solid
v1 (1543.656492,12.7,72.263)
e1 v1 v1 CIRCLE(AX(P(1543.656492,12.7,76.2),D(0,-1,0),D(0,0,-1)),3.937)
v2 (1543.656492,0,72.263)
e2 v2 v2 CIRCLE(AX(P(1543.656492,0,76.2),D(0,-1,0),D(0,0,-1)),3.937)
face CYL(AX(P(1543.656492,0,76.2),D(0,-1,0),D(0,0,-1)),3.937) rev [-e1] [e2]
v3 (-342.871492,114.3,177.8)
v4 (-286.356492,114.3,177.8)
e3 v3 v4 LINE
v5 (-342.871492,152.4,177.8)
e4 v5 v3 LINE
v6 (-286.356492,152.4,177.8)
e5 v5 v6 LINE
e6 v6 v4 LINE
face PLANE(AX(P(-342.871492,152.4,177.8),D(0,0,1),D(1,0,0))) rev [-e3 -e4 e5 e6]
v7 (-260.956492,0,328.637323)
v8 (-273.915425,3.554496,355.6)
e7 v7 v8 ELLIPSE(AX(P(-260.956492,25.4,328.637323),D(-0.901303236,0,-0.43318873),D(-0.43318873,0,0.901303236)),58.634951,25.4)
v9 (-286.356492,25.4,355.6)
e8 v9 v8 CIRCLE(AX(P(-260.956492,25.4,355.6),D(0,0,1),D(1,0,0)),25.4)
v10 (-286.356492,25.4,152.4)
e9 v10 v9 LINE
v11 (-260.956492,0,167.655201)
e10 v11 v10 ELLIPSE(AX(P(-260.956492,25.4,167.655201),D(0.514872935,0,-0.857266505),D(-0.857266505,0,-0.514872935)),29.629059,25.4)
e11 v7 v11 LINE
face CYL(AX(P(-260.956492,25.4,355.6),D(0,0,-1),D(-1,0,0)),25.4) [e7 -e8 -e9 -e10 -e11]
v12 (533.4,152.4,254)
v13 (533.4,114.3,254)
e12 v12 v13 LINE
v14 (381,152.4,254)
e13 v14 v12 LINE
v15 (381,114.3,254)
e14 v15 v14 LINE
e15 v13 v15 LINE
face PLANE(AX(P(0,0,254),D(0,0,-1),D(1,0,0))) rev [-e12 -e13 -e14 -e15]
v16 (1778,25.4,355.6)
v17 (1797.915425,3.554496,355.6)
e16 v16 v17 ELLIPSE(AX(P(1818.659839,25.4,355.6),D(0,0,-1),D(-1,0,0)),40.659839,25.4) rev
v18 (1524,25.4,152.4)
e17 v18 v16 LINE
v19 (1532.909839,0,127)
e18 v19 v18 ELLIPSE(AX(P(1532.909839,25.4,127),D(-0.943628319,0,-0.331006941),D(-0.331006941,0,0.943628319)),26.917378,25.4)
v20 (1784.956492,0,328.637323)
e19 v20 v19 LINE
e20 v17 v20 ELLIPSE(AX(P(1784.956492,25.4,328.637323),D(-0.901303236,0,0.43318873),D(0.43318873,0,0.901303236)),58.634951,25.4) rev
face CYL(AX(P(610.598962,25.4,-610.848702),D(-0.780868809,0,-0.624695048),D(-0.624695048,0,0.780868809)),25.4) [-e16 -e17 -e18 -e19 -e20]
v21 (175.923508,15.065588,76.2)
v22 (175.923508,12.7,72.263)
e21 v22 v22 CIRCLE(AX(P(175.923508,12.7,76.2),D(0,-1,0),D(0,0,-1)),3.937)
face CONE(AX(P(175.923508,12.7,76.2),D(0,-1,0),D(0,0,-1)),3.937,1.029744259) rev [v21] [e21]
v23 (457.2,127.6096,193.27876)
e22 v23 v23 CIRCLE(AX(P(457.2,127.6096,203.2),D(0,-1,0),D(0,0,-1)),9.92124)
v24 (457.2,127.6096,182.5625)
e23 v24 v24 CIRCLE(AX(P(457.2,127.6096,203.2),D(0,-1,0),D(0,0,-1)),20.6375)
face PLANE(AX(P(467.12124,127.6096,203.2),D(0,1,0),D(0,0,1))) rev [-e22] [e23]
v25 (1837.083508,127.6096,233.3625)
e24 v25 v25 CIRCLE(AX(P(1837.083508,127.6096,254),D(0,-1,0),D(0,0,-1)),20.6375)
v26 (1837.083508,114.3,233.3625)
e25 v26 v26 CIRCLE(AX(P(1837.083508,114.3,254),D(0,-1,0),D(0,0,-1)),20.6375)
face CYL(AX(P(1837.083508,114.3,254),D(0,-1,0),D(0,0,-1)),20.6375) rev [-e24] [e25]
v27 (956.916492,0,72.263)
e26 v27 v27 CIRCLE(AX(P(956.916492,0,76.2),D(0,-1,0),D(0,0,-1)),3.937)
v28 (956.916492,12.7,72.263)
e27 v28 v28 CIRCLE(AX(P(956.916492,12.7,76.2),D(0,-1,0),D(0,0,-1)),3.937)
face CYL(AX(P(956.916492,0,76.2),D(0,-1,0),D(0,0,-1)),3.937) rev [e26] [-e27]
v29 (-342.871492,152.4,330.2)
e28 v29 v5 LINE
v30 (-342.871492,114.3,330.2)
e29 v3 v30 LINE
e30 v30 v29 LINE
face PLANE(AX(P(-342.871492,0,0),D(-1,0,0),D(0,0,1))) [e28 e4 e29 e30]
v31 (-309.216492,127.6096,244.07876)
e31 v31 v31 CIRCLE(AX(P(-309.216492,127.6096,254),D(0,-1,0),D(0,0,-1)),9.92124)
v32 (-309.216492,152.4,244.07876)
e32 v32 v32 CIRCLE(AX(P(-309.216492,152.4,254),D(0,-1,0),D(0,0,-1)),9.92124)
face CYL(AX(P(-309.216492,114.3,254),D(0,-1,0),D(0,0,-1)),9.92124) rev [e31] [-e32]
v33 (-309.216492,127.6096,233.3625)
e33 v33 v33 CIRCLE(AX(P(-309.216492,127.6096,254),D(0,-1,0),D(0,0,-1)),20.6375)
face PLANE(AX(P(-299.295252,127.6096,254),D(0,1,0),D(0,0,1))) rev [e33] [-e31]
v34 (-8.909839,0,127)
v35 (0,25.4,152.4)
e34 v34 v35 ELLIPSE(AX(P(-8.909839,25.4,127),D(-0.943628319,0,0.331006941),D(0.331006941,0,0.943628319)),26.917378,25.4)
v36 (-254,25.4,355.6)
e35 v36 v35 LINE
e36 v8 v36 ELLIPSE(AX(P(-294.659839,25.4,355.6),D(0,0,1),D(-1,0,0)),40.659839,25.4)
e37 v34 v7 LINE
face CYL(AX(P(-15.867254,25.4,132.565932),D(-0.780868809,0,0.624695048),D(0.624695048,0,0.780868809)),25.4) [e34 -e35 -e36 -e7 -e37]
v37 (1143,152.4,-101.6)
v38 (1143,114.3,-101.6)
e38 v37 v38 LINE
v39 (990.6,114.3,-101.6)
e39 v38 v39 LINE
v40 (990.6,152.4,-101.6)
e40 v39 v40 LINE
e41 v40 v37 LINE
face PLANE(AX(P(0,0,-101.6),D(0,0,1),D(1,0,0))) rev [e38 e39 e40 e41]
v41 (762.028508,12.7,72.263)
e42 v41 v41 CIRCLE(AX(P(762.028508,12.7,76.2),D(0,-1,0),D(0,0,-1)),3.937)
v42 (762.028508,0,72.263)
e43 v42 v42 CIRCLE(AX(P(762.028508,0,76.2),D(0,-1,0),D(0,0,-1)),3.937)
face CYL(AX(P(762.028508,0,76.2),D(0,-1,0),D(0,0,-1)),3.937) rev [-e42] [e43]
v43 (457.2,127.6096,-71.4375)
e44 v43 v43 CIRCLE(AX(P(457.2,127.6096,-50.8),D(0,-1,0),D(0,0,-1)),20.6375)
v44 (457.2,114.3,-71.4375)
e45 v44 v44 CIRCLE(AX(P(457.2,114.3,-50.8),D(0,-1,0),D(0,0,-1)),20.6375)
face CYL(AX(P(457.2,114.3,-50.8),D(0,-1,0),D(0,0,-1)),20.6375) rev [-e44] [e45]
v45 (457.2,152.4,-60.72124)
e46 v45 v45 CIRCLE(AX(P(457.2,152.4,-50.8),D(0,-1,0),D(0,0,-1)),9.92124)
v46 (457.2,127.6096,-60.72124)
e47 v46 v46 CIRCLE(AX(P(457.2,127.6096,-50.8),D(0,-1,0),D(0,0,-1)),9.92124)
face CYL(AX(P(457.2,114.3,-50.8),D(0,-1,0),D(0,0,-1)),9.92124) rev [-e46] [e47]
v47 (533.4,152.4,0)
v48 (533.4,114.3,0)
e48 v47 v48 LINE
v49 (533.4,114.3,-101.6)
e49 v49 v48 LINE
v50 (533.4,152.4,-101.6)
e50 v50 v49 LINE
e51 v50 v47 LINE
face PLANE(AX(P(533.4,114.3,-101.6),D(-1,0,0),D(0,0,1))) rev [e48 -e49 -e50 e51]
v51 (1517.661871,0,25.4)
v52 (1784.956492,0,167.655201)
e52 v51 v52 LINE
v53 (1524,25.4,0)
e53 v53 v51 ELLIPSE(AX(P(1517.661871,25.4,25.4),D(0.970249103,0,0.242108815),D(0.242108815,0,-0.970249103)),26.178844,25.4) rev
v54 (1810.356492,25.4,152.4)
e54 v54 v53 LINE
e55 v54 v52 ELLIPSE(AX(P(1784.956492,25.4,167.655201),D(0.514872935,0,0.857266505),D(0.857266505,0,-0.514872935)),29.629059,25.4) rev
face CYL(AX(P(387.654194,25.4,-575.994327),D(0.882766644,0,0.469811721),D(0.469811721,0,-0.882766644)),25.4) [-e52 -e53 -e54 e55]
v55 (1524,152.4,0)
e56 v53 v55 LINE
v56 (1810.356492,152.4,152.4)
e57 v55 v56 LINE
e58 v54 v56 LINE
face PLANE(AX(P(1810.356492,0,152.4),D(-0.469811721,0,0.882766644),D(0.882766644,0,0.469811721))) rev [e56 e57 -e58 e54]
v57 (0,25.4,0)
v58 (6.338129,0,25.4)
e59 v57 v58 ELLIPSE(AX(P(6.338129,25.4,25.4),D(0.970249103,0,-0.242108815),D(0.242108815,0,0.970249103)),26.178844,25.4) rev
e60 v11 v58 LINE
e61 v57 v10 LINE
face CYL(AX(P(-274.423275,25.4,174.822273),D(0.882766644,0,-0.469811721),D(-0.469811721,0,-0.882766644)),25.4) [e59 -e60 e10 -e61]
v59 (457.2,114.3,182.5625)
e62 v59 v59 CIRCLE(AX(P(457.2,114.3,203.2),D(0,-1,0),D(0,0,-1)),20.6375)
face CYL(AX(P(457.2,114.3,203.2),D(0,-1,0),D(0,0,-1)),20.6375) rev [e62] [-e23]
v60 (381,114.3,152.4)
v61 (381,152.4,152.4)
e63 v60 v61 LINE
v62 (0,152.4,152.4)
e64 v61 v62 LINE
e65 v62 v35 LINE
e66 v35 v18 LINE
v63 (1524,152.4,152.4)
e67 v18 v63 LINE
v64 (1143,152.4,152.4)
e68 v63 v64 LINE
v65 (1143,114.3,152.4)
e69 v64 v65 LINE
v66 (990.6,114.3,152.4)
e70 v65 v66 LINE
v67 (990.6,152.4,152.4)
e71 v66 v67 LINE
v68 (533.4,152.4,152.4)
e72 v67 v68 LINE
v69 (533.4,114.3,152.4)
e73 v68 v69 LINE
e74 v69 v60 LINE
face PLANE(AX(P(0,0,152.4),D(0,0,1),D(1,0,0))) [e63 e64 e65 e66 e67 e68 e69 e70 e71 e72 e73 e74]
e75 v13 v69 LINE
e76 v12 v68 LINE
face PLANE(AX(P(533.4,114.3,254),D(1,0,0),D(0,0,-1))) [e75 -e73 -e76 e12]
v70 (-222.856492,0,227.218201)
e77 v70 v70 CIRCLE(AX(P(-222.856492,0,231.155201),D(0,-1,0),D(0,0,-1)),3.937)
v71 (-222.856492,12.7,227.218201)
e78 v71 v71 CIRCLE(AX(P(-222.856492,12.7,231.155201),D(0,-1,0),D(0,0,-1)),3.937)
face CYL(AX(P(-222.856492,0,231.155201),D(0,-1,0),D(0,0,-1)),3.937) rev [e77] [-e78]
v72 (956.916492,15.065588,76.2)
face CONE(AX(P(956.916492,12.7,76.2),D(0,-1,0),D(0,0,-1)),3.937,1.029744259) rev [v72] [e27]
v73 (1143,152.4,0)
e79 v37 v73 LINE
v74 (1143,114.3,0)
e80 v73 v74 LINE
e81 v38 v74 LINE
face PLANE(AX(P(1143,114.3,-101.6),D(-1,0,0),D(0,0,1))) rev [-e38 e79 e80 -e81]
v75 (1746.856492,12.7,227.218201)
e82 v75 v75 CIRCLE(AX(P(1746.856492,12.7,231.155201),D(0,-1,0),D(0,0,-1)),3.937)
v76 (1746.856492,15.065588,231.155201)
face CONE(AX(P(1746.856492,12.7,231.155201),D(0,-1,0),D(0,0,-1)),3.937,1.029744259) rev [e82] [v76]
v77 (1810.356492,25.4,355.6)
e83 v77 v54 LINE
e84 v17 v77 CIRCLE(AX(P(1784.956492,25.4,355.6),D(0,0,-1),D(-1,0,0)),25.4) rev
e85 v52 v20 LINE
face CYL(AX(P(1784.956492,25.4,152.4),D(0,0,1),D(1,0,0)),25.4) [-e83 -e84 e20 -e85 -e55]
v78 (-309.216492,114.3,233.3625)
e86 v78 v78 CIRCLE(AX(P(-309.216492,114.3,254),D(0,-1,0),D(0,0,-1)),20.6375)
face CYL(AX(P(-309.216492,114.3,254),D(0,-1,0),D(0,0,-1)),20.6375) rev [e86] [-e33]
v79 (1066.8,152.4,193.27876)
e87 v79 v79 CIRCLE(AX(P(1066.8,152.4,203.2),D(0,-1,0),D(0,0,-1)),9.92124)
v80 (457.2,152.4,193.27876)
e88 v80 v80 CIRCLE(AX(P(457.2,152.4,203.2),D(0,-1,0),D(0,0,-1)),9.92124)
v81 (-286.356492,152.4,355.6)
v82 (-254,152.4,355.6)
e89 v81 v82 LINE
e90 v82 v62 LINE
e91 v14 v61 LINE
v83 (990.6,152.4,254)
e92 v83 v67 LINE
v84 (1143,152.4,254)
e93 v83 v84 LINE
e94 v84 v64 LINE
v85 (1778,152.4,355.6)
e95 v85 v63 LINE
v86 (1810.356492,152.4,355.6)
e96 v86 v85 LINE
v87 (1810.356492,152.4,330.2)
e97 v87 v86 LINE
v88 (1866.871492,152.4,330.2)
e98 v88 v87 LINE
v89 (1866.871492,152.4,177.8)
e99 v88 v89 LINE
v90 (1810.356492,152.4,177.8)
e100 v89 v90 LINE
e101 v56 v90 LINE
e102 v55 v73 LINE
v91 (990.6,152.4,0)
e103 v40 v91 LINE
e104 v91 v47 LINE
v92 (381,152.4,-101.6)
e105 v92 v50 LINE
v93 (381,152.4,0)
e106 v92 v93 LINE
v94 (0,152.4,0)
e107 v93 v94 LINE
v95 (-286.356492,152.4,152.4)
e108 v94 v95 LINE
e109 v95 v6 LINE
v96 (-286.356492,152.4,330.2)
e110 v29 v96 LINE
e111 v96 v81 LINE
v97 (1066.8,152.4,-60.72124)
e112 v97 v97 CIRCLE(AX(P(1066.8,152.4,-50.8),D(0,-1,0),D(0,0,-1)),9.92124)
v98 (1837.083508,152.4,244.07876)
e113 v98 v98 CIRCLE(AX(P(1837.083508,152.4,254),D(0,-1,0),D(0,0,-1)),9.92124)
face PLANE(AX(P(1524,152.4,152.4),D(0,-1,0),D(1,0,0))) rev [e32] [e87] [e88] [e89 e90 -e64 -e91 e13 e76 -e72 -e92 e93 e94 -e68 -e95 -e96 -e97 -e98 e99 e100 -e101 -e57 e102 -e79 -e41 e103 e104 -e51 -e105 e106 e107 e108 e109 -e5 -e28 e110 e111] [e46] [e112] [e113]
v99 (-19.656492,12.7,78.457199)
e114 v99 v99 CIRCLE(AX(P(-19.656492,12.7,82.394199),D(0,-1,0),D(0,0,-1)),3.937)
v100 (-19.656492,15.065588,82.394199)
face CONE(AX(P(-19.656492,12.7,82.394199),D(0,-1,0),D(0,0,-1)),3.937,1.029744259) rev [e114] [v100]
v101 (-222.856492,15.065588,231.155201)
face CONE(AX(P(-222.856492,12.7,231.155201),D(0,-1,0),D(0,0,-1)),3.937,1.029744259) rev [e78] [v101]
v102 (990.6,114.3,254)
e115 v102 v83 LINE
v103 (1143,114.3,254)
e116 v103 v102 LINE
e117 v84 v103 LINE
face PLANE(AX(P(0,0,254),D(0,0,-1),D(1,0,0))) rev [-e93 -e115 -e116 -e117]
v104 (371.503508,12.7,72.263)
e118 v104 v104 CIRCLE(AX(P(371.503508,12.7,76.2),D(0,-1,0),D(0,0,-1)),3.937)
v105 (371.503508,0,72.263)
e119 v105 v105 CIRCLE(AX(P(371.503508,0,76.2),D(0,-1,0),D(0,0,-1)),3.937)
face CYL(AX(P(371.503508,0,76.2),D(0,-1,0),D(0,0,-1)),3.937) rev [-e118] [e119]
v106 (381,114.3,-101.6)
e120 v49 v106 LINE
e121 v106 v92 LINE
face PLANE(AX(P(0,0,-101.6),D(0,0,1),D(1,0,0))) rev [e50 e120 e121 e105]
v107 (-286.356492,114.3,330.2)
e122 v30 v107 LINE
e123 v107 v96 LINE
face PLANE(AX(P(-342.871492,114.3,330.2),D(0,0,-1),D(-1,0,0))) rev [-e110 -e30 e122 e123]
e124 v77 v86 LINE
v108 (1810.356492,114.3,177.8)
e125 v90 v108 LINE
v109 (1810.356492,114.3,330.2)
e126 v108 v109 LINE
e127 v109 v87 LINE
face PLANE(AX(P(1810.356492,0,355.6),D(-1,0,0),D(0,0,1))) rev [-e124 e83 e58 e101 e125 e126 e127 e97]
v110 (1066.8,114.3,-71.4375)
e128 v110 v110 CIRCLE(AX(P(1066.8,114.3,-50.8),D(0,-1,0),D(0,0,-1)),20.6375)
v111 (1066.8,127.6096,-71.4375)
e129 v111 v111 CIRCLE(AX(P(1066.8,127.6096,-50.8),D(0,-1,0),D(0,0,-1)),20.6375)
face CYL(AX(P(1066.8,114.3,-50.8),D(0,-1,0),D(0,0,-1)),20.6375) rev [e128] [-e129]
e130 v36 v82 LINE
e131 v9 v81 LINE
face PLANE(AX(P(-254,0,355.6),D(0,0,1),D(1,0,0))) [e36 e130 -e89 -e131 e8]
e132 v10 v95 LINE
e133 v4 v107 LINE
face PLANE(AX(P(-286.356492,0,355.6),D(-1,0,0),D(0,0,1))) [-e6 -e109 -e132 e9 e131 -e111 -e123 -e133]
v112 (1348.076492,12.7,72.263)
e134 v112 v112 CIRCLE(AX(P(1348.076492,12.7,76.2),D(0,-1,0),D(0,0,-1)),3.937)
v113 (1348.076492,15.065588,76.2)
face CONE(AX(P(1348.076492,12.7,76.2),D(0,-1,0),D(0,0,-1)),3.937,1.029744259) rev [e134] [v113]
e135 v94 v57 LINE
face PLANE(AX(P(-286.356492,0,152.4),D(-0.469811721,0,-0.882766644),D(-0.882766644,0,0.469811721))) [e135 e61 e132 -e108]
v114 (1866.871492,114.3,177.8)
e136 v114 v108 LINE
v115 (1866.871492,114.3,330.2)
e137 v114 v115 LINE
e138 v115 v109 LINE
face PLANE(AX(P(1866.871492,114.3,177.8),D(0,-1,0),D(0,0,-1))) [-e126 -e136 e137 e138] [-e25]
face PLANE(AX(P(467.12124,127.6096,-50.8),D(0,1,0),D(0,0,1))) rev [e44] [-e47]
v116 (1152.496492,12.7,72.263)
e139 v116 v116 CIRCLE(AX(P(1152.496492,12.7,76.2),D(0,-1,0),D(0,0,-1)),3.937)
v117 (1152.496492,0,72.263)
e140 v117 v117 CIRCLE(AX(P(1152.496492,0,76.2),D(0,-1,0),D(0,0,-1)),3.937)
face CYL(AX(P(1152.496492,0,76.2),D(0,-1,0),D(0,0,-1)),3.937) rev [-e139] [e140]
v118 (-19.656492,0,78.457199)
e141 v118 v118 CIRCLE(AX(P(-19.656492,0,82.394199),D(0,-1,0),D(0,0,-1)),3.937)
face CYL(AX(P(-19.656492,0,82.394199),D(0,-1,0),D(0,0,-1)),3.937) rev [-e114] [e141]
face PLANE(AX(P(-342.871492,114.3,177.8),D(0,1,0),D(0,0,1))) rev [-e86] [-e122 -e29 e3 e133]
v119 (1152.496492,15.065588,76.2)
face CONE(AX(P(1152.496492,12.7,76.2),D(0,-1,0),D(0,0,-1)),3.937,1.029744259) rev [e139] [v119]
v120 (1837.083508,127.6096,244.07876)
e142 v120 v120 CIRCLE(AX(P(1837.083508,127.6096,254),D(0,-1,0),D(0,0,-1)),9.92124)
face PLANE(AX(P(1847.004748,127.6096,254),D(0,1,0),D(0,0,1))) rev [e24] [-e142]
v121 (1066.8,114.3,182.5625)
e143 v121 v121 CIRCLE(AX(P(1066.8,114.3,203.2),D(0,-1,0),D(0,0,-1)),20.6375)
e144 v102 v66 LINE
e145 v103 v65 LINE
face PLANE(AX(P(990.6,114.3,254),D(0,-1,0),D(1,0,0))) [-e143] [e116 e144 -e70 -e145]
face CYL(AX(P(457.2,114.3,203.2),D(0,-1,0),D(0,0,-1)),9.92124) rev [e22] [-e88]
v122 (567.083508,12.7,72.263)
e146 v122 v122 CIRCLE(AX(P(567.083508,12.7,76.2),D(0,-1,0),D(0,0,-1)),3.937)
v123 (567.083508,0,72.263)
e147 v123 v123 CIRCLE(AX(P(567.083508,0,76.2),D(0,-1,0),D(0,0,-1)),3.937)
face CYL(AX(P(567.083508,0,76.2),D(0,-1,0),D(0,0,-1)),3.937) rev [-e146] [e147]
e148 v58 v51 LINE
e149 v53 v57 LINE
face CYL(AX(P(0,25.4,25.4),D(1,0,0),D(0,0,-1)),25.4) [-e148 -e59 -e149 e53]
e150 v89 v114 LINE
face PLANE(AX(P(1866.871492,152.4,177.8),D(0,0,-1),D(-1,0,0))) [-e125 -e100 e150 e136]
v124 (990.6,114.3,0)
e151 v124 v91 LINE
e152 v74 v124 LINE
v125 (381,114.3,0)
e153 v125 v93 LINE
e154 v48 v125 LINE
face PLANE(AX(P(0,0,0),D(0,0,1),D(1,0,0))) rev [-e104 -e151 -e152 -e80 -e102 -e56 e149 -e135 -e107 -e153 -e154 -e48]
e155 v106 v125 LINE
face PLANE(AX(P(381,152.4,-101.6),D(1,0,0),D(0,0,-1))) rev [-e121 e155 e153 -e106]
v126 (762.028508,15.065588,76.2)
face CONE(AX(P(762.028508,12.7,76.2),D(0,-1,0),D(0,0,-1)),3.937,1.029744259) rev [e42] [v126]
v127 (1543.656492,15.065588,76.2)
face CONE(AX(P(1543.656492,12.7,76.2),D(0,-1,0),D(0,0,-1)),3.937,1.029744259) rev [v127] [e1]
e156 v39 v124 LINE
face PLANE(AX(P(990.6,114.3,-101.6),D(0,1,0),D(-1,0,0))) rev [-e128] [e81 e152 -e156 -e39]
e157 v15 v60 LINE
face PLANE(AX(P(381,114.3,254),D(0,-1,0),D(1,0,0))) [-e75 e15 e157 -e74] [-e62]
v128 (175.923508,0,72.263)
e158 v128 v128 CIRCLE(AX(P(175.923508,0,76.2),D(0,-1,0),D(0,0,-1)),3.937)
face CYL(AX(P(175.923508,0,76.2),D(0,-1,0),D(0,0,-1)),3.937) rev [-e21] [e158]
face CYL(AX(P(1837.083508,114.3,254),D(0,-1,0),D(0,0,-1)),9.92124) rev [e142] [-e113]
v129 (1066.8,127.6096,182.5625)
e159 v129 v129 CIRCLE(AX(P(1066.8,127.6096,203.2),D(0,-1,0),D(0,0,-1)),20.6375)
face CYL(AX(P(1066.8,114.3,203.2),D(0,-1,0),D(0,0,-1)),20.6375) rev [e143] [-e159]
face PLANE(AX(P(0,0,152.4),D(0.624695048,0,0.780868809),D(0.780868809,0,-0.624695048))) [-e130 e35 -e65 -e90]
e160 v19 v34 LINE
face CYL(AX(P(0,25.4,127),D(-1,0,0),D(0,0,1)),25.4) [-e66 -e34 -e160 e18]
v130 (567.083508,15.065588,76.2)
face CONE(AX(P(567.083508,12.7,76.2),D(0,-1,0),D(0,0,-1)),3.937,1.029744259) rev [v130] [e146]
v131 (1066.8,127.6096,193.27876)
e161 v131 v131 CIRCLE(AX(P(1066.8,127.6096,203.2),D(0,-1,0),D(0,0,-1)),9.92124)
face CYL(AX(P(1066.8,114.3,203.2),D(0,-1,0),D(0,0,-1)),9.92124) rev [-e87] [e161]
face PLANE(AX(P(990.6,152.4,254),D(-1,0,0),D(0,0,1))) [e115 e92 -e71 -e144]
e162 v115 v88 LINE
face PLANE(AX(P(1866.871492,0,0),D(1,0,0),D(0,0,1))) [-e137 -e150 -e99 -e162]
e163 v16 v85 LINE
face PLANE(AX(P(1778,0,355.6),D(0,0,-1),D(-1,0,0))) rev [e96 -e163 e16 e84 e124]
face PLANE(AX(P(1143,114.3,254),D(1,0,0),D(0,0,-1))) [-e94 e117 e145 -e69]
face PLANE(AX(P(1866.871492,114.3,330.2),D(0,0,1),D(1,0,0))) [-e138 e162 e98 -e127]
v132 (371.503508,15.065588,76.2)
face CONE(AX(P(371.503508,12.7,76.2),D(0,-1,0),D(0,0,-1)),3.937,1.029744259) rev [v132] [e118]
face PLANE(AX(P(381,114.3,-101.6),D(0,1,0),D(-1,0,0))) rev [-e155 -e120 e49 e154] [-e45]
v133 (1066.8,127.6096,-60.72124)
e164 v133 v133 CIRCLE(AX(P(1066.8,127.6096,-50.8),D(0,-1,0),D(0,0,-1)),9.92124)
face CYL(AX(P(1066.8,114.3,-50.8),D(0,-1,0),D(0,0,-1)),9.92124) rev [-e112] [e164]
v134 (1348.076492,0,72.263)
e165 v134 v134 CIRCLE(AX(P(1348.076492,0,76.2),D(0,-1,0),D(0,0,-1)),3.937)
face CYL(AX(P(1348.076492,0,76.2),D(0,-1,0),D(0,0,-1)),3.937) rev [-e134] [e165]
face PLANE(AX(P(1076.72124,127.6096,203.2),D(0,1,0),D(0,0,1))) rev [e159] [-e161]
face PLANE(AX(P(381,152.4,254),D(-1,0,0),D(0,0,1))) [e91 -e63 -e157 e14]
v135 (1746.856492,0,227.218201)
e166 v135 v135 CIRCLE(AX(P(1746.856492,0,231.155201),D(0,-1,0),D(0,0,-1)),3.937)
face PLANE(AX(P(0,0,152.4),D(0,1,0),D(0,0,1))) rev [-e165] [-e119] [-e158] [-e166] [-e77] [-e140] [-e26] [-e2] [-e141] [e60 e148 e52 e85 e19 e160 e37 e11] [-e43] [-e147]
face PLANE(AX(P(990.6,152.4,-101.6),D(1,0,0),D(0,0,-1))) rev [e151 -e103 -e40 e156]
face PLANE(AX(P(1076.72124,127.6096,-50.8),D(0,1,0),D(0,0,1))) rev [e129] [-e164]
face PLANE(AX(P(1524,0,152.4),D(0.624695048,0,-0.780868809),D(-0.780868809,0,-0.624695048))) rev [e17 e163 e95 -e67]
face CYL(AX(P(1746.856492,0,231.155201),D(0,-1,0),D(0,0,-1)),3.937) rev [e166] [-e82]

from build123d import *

# Parameters (mm, degrees)
SKETCH1_W                                = 1524
SKETCH1_H                                = 152.4
BOSS_EXTRUDE1_DEPTH                      = 152.4
BOSS_EXTRUDE2_DEPTH                      = 152.4
FILLET1_R                                = 25.4
SKETCH9_W                                = 152.4
SKETCH9_H                                = 38.1
BOSS_EXTRUDE3_DEPTH                      = 101.6
SKETCH11_W                               = 152.4
SKETCH11_H                               = 38.1
BOSS_EXTRUDE4_DEPTH                      = 56.515
F_0000_CLEARANCE_HOLE1_D                 = 7.874
F_0000_CLEARANCE_HOLE1_DEPTH             = 12.7
F_0000_CLEARANCE_HOLE1_TIP               = 2.365588257
CBORE_FOR_3_4_HEX_HEAD_BOLT1_D           = 19.84248
CBORE_FOR_3_4_HEX_HEAD_BOLT1_CBORE_D     = 41.275
CBORE_FOR_3_4_HEX_HEAD_BOLT1_CBORE_DEPTH = 13.3096


with BuildPart() as part:
    # Sketch1 → Boss-Extrude1 (new body)
    with BuildSketch(Plane.XY):
        with Locations((762, 76.2)):
            Rectangle(SKETCH1_W, SKETCH1_H)
    extrude(amount=BOSS_EXTRUDE1_DEPTH)

    # Sketch8 → Boss-Extrude2 (add)
    with BuildSketch(Plane(origin=(0, 152.4, 0), x_dir=(1, 0, 0), z_dir=(0, 1, 0))):
        Polygon((0, -152.4), (-254, -355.6), (-286.356492461, -355.6), (-286.356492461, -152.4), (0, 0), align=None)
    boss_extrude2 = extrude(amount=-BOSS_EXTRUDE2_DEPTH)

    # Mirror1: Boss-Extrude2 across plane
    add(boss_extrude2.mirror(Plane(origin=(762, 0, 0), x_dir=(0, 0, 1), z_dir=(1, 0, 0))))

    # Fillet1
    # the kernel refuses this fillet: 25.4 mm, written as the material it takes off along each edge
    with BuildSketch(Plane(origin=(-342.412174328, 0, 182.23304427), x_dir=(0, 1, 0), z_dir=(0.882766643577138, 0, -0.4698117207856294))) as fillet1_piece_1:
        with BuildLine():
            CenterArc((FILLET1_R, FILLET1_R), FILLET1_R, 180, 90)
            Line((0, FILLET1_R), (0, 0))
            Line((0, 0), (FILLET1_R, 0))
        make_face()
    extrude(amount=451.385265964, mode=Mode.SUBTRACT)
    with BuildSketch(Plane(origin=(-286.356492461, 0, 419.1), x_dir=(0, 1, 0), z_dir=(0, 0, -1))) as fillet1_piece_2:
        with BuildLine():
            CenterArc((FILLET1_R, FILLET1_R), FILLET1_R, 180, 90)
            Line((0, FILLET1_R), (0, 0))
            Line((0, 0), (FILLET1_R, 0))
        make_face()
    extrude(amount=330.2, mode=Mode.SUBTRACT)
    with BuildSketch(Plane(origin=(49.5851694, 0, 112.73186448), x_dir=(0, 1, 0), z_dir=(-0.780868809443027, 0, 0.6246950475544286))) as fillet1_piece_3_section:
        with BuildLine():
            CenterArc((FILLET1_R, FILLET1_R), FILLET1_R, 180, 90)
            Line((0, FILLET1_R), (0, 0))
            Line((0, 0), (FILLET1_R, 0))
        make_face()
    fillet1_piece_3 = extrude(amount=452.278711262, mode=Mode.PRIVATE)
    fillet1_piece_3 = split(fillet1_piece_3, bisect_by=Plane(origin=(-158.082016781, 5.808462647, 152.4), z_dir=(0, 0, 1)), keep=Keep.TOP, mode=Mode.PRIVATE)
    add(fillet1_piece_3, mode=Mode.SUBTRACT)
    with BuildSketch(Plane(origin=(-63.5, 0, 152.4), x_dir=(0, 1, 0), z_dir=(1, 0, 0))) as fillet1_piece_4_section:
        with BuildLine():
            CenterArc((FILLET1_R, -FILLET1_R), FILLET1_R, 90, 90)
            Line((0, -FILLET1_R), (0, 0))
            Line((0, 0), (FILLET1_R, 0))
        make_face()
    fillet1_piece_4 = extrude(amount=1651, mode=Mode.PRIVATE)
    fillet1_piece_4 = split(fillet1_piece_4, bisect_by=Plane(origin=(467.415014496, 5.779770976, -221.532011596), z_dir=(0.6246950475544286, 0, 0.780868809443027)), keep=Keep.TOP, mode=Mode.PRIVATE)
    fillet1_piece_4 = split(fillet1_piece_4, bisect_by=Plane(origin=(1056.584985505, 5.779770976, -221.532011596), z_dir=(-0.6246950475544286, 0, 0.780868809443027)), keep=Keep.TOP, mode=Mode.PRIVATE)
    add(fillet1_piece_4, mode=Mode.SUBTRACT)
    with BuildSketch(Plane(origin=(1474.4148306, 0, 112.73186448), x_dir=(0, 1, 0), z_dir=(0.780868809443027, 0, 0.6246950475544286))) as fillet1_piece_5_section:
        with BuildLine():
            CenterArc((FILLET1_R, -FILLET1_R), FILLET1_R, 90, 90)
            Line((0, -FILLET1_R), (0, 0))
            Line((0, 0), (FILLET1_R, 0))
        make_face()
    fillet1_piece_5 = extrude(amount=452.278711262, mode=Mode.PRIVATE)
    fillet1_piece_5 = split(fillet1_piece_5, bisect_by=Plane(origin=(1682.082016781, 5.808462647, 152.4), z_dir=(0, 0, 1)), keep=Keep.TOP, mode=Mode.PRIVATE)
    add(fillet1_piece_5, mode=Mode.SUBTRACT)
    with BuildSketch(Plane(origin=(1810.356492461, 0, 419.1), x_dir=(0, 1, 0), z_dir=(0, 0, -1))) as fillet1_piece_6:
        with BuildLine():
            CenterArc((FILLET1_R, -FILLET1_R), FILLET1_R, 90, 90)
            Line((0, -FILLET1_R), (0, 0))
            Line((0, 0), (FILLET1_R, 0))
        make_face()
    extrude(amount=330.2, mode=Mode.SUBTRACT)
    with BuildSketch(Plane(origin=(1866.412174328, 0, 182.23304427), x_dir=(0, 1, 0), z_dir=(-0.882766643577138, 0, -0.4698117207856294))) as fillet1_piece_7:
        with BuildLine():
            CenterArc((FILLET1_R, -FILLET1_R), FILLET1_R, 90, 90)
            Line((0, -FILLET1_R), (0, 0))
            Line((0, 0), (FILLET1_R, 0))
        make_face()
    extrude(amount=451.385265964, mode=Mode.SUBTRACT)
    with BuildSketch(Plane(origin=(-63.5, 0, 0), x_dir=(0, 1, 0), z_dir=(1, 0, 0))) as fillet1_piece_8:
        with BuildLine():
            CenterArc((FILLET1_R, FILLET1_R), FILLET1_R, 180, 90)
            Line((0, FILLET1_R), (0, 0))
            Line((0, 0), (FILLET1_R, 0))
        make_face()
    extrude(amount=1651, mode=Mode.SUBTRACT)
    with BuildSketch(Plane(origin=(-63.5, 0, 152.4), x_dir=(0, 1, 0), z_dir=(1, 0, 0))) as fillet1_piece_9a_section:
        with BuildLine():
            CenterArc((FILLET1_R, -FILLET1_R), FILLET1_R, 90, 90)
            Line((0, -FILLET1_R), (0, 0))
            Line((0, 0), (FILLET1_R, 0))
        make_face()
    fillet1_piece_9a = extrude(amount=1651, mode=Mode.PRIVATE)
    fillet1_piece_9a = split(fillet1_piece_9a, bisect_by=Plane(origin=(-13.902468194, 5.43719391, 163.521974555), z_dir=(-0.6246950475544286, 0, -0.780868809443027)), keep=Keep.TOP, mode=Mode.PRIVATE)
    with BuildSketch(Plane(origin=(49.5851694, 0, 112.73186448), x_dir=(0, 1, 0), z_dir=(-0.780868809443027, 0, 0.6246950475544286))) as fillet1_piece_9b_section:
        with BuildLine():
            CenterArc((FILLET1_R, FILLET1_R), FILLET1_R, 180, 90)
            Line((0, FILLET1_R), (0, 0))
            Line((0, 0), (FILLET1_R, 0))
        make_face()
    fillet1_piece_9b = extrude(amount=452.278711262, mode=Mode.PRIVATE)
    fillet1_piece_9b = split(fillet1_piece_9b, bisect_by=Plane(origin=(17.80384621, 5.43719391, 152.4), z_dir=(0, 0, -1)), keep=Keep.TOP, mode=Mode.PRIVATE)
    fillet1_piece_9 = fillet1_piece_9a & fillet1_piece_9b
    add(fillet1_piece_9, mode=Mode.SUBTRACT)
    with BuildSketch(Plane(origin=(-63.5, 0, 152.4), x_dir=(0, 1, 0), z_dir=(1, 0, 0))) as fillet1_piece_10a_section:
        with BuildLine():
            CenterArc((FILLET1_R, -FILLET1_R), FILLET1_R, 90, 90)
            Line((0, -FILLET1_R), (0, 0))
            Line((0, 0), (FILLET1_R, 0))
        make_face()
    fillet1_piece_10a = extrude(amount=1651, mode=Mode.PRIVATE)
    fillet1_piece_10a = split(fillet1_piece_10a, bisect_by=Plane(origin=(1537.902468194, 5.43719391, 163.521974555), z_dir=(0.6246950475544286, 0, -0.780868809443027)), keep=Keep.TOP, mode=Mode.PRIVATE)
    with BuildSketch(Plane(origin=(1474.4148306, 0, 112.73186448), x_dir=(0, 1, 0), z_dir=(0.780868809443027, 0, 0.6246950475544286))) as fillet1_piece_10b_section:
        with BuildLine():
            CenterArc((FILLET1_R, -FILLET1_R), FILLET1_R, 90, 90)
            Line((0, -FILLET1_R), (0, 0))
            Line((0, 0), (FILLET1_R, 0))
        make_face()
    fillet1_piece_10b = extrude(amount=452.278711262, mode=Mode.PRIVATE)
    fillet1_piece_10b = split(fillet1_piece_10b, bisect_by=Plane(origin=(1506.19615379, 5.43719391, 152.4), z_dir=(0, 0, -1)), keep=Keep.TOP, mode=Mode.PRIVATE)
    fillet1_piece_10 = fillet1_piece_10a & fillet1_piece_10b
    add(fillet1_piece_10, mode=Mode.SUBTRACT)

    # Sketch9 → Boss-Extrude3 (add)
    with BuildSketch(Plane(origin=(0, 0, 0), x_dir=(-1, 0, 0), z_dir=(0, 0, -1))):
        with Locations((-457.2, 133.35)):
            Rectangle(SKETCH9_W, SKETCH9_H)
        with Locations((-1066.8, 133.35)):
            Rectangle(SKETCH9_W, SKETCH9_H)
    boss_extrude3 = extrude(amount=BOSS_EXTRUDE3_DEPTH)

    # Sketch11 → Boss-Extrude4 (add)
    with BuildSketch(Plane.ZY.offset(286.356492461)):
        with Locations((254, 133.35)):
            Rectangle(SKETCH11_W, SKETCH11_H)
    boss_extrude4 = extrude(amount=BOSS_EXTRUDE4_DEPTH)

    # Mirror3: Boss-Extrude4 across plane
    add(boss_extrude4.mirror(Plane(origin=(762, 0, 0), x_dir=(0, 0, 1), z_dir=(1, 0, 0))))

    # Mirror4: Boss-Extrude3 across plane
    add(boss_extrude3.mirror(Plane.XY.offset(76.2)))

    # #0000 Clearance Hole1
    with Locations(Plane(origin=(0, 0, 0), x_dir=(-1, 0, 0), z_dir=(0, -1, 0))):
        with Locations((222.856492461, -231.155200669), (19.656492461, -82.394199052), (-175.923507539, -76.2), (-371.503507539, -76.2), (-567.083507539, -76.2), (-762.028507539, -76.2), (-956.916492461, -76.2), (-1152.496492461, -76.2), (-1348.076492461, -76.2), (-1543.656492461, -76.2), (-1746.856492461, -231.155200669)):
            Hole(F_0000_CLEARANCE_HOLE1_D / 2, depth=F_0000_CLEARANCE_HOLE1_DEPTH)
            with Locations((0, 0, -(F_0000_CLEARANCE_HOLE1_DEPTH + F_0000_CLEARANCE_HOLE1_TIP / 2))):  # 118° drill point
                Cone(0, F_0000_CLEARANCE_HOLE1_D / 2, F_0000_CLEARANCE_HOLE1_TIP, mode=Mode.SUBTRACT)

    # CBORE for 3/4 Hex Head Bolt1 (through all)
    with Locations(Plane(origin=(0, 114.3, 0), x_dir=(-1, 0, 0), z_dir=(0, -1, 0))):
        with Locations((-457.2, 50.8), (-457.2, -203.2), (-1066.8, 50.8), (-1066.8, -203.2), (-1837.083507539, -254), (309.216492461, -254)):
            CounterBoreHole(CBORE_FOR_3_4_HEX_HEAD_BOLT1_D / 2, CBORE_FOR_3_4_HEX_HEAD_BOLT1_CBORE_D / 2, CBORE_FOR_3_4_HEX_HEAD_BOLT1_CBORE_DEPTH)


solid = part.part
